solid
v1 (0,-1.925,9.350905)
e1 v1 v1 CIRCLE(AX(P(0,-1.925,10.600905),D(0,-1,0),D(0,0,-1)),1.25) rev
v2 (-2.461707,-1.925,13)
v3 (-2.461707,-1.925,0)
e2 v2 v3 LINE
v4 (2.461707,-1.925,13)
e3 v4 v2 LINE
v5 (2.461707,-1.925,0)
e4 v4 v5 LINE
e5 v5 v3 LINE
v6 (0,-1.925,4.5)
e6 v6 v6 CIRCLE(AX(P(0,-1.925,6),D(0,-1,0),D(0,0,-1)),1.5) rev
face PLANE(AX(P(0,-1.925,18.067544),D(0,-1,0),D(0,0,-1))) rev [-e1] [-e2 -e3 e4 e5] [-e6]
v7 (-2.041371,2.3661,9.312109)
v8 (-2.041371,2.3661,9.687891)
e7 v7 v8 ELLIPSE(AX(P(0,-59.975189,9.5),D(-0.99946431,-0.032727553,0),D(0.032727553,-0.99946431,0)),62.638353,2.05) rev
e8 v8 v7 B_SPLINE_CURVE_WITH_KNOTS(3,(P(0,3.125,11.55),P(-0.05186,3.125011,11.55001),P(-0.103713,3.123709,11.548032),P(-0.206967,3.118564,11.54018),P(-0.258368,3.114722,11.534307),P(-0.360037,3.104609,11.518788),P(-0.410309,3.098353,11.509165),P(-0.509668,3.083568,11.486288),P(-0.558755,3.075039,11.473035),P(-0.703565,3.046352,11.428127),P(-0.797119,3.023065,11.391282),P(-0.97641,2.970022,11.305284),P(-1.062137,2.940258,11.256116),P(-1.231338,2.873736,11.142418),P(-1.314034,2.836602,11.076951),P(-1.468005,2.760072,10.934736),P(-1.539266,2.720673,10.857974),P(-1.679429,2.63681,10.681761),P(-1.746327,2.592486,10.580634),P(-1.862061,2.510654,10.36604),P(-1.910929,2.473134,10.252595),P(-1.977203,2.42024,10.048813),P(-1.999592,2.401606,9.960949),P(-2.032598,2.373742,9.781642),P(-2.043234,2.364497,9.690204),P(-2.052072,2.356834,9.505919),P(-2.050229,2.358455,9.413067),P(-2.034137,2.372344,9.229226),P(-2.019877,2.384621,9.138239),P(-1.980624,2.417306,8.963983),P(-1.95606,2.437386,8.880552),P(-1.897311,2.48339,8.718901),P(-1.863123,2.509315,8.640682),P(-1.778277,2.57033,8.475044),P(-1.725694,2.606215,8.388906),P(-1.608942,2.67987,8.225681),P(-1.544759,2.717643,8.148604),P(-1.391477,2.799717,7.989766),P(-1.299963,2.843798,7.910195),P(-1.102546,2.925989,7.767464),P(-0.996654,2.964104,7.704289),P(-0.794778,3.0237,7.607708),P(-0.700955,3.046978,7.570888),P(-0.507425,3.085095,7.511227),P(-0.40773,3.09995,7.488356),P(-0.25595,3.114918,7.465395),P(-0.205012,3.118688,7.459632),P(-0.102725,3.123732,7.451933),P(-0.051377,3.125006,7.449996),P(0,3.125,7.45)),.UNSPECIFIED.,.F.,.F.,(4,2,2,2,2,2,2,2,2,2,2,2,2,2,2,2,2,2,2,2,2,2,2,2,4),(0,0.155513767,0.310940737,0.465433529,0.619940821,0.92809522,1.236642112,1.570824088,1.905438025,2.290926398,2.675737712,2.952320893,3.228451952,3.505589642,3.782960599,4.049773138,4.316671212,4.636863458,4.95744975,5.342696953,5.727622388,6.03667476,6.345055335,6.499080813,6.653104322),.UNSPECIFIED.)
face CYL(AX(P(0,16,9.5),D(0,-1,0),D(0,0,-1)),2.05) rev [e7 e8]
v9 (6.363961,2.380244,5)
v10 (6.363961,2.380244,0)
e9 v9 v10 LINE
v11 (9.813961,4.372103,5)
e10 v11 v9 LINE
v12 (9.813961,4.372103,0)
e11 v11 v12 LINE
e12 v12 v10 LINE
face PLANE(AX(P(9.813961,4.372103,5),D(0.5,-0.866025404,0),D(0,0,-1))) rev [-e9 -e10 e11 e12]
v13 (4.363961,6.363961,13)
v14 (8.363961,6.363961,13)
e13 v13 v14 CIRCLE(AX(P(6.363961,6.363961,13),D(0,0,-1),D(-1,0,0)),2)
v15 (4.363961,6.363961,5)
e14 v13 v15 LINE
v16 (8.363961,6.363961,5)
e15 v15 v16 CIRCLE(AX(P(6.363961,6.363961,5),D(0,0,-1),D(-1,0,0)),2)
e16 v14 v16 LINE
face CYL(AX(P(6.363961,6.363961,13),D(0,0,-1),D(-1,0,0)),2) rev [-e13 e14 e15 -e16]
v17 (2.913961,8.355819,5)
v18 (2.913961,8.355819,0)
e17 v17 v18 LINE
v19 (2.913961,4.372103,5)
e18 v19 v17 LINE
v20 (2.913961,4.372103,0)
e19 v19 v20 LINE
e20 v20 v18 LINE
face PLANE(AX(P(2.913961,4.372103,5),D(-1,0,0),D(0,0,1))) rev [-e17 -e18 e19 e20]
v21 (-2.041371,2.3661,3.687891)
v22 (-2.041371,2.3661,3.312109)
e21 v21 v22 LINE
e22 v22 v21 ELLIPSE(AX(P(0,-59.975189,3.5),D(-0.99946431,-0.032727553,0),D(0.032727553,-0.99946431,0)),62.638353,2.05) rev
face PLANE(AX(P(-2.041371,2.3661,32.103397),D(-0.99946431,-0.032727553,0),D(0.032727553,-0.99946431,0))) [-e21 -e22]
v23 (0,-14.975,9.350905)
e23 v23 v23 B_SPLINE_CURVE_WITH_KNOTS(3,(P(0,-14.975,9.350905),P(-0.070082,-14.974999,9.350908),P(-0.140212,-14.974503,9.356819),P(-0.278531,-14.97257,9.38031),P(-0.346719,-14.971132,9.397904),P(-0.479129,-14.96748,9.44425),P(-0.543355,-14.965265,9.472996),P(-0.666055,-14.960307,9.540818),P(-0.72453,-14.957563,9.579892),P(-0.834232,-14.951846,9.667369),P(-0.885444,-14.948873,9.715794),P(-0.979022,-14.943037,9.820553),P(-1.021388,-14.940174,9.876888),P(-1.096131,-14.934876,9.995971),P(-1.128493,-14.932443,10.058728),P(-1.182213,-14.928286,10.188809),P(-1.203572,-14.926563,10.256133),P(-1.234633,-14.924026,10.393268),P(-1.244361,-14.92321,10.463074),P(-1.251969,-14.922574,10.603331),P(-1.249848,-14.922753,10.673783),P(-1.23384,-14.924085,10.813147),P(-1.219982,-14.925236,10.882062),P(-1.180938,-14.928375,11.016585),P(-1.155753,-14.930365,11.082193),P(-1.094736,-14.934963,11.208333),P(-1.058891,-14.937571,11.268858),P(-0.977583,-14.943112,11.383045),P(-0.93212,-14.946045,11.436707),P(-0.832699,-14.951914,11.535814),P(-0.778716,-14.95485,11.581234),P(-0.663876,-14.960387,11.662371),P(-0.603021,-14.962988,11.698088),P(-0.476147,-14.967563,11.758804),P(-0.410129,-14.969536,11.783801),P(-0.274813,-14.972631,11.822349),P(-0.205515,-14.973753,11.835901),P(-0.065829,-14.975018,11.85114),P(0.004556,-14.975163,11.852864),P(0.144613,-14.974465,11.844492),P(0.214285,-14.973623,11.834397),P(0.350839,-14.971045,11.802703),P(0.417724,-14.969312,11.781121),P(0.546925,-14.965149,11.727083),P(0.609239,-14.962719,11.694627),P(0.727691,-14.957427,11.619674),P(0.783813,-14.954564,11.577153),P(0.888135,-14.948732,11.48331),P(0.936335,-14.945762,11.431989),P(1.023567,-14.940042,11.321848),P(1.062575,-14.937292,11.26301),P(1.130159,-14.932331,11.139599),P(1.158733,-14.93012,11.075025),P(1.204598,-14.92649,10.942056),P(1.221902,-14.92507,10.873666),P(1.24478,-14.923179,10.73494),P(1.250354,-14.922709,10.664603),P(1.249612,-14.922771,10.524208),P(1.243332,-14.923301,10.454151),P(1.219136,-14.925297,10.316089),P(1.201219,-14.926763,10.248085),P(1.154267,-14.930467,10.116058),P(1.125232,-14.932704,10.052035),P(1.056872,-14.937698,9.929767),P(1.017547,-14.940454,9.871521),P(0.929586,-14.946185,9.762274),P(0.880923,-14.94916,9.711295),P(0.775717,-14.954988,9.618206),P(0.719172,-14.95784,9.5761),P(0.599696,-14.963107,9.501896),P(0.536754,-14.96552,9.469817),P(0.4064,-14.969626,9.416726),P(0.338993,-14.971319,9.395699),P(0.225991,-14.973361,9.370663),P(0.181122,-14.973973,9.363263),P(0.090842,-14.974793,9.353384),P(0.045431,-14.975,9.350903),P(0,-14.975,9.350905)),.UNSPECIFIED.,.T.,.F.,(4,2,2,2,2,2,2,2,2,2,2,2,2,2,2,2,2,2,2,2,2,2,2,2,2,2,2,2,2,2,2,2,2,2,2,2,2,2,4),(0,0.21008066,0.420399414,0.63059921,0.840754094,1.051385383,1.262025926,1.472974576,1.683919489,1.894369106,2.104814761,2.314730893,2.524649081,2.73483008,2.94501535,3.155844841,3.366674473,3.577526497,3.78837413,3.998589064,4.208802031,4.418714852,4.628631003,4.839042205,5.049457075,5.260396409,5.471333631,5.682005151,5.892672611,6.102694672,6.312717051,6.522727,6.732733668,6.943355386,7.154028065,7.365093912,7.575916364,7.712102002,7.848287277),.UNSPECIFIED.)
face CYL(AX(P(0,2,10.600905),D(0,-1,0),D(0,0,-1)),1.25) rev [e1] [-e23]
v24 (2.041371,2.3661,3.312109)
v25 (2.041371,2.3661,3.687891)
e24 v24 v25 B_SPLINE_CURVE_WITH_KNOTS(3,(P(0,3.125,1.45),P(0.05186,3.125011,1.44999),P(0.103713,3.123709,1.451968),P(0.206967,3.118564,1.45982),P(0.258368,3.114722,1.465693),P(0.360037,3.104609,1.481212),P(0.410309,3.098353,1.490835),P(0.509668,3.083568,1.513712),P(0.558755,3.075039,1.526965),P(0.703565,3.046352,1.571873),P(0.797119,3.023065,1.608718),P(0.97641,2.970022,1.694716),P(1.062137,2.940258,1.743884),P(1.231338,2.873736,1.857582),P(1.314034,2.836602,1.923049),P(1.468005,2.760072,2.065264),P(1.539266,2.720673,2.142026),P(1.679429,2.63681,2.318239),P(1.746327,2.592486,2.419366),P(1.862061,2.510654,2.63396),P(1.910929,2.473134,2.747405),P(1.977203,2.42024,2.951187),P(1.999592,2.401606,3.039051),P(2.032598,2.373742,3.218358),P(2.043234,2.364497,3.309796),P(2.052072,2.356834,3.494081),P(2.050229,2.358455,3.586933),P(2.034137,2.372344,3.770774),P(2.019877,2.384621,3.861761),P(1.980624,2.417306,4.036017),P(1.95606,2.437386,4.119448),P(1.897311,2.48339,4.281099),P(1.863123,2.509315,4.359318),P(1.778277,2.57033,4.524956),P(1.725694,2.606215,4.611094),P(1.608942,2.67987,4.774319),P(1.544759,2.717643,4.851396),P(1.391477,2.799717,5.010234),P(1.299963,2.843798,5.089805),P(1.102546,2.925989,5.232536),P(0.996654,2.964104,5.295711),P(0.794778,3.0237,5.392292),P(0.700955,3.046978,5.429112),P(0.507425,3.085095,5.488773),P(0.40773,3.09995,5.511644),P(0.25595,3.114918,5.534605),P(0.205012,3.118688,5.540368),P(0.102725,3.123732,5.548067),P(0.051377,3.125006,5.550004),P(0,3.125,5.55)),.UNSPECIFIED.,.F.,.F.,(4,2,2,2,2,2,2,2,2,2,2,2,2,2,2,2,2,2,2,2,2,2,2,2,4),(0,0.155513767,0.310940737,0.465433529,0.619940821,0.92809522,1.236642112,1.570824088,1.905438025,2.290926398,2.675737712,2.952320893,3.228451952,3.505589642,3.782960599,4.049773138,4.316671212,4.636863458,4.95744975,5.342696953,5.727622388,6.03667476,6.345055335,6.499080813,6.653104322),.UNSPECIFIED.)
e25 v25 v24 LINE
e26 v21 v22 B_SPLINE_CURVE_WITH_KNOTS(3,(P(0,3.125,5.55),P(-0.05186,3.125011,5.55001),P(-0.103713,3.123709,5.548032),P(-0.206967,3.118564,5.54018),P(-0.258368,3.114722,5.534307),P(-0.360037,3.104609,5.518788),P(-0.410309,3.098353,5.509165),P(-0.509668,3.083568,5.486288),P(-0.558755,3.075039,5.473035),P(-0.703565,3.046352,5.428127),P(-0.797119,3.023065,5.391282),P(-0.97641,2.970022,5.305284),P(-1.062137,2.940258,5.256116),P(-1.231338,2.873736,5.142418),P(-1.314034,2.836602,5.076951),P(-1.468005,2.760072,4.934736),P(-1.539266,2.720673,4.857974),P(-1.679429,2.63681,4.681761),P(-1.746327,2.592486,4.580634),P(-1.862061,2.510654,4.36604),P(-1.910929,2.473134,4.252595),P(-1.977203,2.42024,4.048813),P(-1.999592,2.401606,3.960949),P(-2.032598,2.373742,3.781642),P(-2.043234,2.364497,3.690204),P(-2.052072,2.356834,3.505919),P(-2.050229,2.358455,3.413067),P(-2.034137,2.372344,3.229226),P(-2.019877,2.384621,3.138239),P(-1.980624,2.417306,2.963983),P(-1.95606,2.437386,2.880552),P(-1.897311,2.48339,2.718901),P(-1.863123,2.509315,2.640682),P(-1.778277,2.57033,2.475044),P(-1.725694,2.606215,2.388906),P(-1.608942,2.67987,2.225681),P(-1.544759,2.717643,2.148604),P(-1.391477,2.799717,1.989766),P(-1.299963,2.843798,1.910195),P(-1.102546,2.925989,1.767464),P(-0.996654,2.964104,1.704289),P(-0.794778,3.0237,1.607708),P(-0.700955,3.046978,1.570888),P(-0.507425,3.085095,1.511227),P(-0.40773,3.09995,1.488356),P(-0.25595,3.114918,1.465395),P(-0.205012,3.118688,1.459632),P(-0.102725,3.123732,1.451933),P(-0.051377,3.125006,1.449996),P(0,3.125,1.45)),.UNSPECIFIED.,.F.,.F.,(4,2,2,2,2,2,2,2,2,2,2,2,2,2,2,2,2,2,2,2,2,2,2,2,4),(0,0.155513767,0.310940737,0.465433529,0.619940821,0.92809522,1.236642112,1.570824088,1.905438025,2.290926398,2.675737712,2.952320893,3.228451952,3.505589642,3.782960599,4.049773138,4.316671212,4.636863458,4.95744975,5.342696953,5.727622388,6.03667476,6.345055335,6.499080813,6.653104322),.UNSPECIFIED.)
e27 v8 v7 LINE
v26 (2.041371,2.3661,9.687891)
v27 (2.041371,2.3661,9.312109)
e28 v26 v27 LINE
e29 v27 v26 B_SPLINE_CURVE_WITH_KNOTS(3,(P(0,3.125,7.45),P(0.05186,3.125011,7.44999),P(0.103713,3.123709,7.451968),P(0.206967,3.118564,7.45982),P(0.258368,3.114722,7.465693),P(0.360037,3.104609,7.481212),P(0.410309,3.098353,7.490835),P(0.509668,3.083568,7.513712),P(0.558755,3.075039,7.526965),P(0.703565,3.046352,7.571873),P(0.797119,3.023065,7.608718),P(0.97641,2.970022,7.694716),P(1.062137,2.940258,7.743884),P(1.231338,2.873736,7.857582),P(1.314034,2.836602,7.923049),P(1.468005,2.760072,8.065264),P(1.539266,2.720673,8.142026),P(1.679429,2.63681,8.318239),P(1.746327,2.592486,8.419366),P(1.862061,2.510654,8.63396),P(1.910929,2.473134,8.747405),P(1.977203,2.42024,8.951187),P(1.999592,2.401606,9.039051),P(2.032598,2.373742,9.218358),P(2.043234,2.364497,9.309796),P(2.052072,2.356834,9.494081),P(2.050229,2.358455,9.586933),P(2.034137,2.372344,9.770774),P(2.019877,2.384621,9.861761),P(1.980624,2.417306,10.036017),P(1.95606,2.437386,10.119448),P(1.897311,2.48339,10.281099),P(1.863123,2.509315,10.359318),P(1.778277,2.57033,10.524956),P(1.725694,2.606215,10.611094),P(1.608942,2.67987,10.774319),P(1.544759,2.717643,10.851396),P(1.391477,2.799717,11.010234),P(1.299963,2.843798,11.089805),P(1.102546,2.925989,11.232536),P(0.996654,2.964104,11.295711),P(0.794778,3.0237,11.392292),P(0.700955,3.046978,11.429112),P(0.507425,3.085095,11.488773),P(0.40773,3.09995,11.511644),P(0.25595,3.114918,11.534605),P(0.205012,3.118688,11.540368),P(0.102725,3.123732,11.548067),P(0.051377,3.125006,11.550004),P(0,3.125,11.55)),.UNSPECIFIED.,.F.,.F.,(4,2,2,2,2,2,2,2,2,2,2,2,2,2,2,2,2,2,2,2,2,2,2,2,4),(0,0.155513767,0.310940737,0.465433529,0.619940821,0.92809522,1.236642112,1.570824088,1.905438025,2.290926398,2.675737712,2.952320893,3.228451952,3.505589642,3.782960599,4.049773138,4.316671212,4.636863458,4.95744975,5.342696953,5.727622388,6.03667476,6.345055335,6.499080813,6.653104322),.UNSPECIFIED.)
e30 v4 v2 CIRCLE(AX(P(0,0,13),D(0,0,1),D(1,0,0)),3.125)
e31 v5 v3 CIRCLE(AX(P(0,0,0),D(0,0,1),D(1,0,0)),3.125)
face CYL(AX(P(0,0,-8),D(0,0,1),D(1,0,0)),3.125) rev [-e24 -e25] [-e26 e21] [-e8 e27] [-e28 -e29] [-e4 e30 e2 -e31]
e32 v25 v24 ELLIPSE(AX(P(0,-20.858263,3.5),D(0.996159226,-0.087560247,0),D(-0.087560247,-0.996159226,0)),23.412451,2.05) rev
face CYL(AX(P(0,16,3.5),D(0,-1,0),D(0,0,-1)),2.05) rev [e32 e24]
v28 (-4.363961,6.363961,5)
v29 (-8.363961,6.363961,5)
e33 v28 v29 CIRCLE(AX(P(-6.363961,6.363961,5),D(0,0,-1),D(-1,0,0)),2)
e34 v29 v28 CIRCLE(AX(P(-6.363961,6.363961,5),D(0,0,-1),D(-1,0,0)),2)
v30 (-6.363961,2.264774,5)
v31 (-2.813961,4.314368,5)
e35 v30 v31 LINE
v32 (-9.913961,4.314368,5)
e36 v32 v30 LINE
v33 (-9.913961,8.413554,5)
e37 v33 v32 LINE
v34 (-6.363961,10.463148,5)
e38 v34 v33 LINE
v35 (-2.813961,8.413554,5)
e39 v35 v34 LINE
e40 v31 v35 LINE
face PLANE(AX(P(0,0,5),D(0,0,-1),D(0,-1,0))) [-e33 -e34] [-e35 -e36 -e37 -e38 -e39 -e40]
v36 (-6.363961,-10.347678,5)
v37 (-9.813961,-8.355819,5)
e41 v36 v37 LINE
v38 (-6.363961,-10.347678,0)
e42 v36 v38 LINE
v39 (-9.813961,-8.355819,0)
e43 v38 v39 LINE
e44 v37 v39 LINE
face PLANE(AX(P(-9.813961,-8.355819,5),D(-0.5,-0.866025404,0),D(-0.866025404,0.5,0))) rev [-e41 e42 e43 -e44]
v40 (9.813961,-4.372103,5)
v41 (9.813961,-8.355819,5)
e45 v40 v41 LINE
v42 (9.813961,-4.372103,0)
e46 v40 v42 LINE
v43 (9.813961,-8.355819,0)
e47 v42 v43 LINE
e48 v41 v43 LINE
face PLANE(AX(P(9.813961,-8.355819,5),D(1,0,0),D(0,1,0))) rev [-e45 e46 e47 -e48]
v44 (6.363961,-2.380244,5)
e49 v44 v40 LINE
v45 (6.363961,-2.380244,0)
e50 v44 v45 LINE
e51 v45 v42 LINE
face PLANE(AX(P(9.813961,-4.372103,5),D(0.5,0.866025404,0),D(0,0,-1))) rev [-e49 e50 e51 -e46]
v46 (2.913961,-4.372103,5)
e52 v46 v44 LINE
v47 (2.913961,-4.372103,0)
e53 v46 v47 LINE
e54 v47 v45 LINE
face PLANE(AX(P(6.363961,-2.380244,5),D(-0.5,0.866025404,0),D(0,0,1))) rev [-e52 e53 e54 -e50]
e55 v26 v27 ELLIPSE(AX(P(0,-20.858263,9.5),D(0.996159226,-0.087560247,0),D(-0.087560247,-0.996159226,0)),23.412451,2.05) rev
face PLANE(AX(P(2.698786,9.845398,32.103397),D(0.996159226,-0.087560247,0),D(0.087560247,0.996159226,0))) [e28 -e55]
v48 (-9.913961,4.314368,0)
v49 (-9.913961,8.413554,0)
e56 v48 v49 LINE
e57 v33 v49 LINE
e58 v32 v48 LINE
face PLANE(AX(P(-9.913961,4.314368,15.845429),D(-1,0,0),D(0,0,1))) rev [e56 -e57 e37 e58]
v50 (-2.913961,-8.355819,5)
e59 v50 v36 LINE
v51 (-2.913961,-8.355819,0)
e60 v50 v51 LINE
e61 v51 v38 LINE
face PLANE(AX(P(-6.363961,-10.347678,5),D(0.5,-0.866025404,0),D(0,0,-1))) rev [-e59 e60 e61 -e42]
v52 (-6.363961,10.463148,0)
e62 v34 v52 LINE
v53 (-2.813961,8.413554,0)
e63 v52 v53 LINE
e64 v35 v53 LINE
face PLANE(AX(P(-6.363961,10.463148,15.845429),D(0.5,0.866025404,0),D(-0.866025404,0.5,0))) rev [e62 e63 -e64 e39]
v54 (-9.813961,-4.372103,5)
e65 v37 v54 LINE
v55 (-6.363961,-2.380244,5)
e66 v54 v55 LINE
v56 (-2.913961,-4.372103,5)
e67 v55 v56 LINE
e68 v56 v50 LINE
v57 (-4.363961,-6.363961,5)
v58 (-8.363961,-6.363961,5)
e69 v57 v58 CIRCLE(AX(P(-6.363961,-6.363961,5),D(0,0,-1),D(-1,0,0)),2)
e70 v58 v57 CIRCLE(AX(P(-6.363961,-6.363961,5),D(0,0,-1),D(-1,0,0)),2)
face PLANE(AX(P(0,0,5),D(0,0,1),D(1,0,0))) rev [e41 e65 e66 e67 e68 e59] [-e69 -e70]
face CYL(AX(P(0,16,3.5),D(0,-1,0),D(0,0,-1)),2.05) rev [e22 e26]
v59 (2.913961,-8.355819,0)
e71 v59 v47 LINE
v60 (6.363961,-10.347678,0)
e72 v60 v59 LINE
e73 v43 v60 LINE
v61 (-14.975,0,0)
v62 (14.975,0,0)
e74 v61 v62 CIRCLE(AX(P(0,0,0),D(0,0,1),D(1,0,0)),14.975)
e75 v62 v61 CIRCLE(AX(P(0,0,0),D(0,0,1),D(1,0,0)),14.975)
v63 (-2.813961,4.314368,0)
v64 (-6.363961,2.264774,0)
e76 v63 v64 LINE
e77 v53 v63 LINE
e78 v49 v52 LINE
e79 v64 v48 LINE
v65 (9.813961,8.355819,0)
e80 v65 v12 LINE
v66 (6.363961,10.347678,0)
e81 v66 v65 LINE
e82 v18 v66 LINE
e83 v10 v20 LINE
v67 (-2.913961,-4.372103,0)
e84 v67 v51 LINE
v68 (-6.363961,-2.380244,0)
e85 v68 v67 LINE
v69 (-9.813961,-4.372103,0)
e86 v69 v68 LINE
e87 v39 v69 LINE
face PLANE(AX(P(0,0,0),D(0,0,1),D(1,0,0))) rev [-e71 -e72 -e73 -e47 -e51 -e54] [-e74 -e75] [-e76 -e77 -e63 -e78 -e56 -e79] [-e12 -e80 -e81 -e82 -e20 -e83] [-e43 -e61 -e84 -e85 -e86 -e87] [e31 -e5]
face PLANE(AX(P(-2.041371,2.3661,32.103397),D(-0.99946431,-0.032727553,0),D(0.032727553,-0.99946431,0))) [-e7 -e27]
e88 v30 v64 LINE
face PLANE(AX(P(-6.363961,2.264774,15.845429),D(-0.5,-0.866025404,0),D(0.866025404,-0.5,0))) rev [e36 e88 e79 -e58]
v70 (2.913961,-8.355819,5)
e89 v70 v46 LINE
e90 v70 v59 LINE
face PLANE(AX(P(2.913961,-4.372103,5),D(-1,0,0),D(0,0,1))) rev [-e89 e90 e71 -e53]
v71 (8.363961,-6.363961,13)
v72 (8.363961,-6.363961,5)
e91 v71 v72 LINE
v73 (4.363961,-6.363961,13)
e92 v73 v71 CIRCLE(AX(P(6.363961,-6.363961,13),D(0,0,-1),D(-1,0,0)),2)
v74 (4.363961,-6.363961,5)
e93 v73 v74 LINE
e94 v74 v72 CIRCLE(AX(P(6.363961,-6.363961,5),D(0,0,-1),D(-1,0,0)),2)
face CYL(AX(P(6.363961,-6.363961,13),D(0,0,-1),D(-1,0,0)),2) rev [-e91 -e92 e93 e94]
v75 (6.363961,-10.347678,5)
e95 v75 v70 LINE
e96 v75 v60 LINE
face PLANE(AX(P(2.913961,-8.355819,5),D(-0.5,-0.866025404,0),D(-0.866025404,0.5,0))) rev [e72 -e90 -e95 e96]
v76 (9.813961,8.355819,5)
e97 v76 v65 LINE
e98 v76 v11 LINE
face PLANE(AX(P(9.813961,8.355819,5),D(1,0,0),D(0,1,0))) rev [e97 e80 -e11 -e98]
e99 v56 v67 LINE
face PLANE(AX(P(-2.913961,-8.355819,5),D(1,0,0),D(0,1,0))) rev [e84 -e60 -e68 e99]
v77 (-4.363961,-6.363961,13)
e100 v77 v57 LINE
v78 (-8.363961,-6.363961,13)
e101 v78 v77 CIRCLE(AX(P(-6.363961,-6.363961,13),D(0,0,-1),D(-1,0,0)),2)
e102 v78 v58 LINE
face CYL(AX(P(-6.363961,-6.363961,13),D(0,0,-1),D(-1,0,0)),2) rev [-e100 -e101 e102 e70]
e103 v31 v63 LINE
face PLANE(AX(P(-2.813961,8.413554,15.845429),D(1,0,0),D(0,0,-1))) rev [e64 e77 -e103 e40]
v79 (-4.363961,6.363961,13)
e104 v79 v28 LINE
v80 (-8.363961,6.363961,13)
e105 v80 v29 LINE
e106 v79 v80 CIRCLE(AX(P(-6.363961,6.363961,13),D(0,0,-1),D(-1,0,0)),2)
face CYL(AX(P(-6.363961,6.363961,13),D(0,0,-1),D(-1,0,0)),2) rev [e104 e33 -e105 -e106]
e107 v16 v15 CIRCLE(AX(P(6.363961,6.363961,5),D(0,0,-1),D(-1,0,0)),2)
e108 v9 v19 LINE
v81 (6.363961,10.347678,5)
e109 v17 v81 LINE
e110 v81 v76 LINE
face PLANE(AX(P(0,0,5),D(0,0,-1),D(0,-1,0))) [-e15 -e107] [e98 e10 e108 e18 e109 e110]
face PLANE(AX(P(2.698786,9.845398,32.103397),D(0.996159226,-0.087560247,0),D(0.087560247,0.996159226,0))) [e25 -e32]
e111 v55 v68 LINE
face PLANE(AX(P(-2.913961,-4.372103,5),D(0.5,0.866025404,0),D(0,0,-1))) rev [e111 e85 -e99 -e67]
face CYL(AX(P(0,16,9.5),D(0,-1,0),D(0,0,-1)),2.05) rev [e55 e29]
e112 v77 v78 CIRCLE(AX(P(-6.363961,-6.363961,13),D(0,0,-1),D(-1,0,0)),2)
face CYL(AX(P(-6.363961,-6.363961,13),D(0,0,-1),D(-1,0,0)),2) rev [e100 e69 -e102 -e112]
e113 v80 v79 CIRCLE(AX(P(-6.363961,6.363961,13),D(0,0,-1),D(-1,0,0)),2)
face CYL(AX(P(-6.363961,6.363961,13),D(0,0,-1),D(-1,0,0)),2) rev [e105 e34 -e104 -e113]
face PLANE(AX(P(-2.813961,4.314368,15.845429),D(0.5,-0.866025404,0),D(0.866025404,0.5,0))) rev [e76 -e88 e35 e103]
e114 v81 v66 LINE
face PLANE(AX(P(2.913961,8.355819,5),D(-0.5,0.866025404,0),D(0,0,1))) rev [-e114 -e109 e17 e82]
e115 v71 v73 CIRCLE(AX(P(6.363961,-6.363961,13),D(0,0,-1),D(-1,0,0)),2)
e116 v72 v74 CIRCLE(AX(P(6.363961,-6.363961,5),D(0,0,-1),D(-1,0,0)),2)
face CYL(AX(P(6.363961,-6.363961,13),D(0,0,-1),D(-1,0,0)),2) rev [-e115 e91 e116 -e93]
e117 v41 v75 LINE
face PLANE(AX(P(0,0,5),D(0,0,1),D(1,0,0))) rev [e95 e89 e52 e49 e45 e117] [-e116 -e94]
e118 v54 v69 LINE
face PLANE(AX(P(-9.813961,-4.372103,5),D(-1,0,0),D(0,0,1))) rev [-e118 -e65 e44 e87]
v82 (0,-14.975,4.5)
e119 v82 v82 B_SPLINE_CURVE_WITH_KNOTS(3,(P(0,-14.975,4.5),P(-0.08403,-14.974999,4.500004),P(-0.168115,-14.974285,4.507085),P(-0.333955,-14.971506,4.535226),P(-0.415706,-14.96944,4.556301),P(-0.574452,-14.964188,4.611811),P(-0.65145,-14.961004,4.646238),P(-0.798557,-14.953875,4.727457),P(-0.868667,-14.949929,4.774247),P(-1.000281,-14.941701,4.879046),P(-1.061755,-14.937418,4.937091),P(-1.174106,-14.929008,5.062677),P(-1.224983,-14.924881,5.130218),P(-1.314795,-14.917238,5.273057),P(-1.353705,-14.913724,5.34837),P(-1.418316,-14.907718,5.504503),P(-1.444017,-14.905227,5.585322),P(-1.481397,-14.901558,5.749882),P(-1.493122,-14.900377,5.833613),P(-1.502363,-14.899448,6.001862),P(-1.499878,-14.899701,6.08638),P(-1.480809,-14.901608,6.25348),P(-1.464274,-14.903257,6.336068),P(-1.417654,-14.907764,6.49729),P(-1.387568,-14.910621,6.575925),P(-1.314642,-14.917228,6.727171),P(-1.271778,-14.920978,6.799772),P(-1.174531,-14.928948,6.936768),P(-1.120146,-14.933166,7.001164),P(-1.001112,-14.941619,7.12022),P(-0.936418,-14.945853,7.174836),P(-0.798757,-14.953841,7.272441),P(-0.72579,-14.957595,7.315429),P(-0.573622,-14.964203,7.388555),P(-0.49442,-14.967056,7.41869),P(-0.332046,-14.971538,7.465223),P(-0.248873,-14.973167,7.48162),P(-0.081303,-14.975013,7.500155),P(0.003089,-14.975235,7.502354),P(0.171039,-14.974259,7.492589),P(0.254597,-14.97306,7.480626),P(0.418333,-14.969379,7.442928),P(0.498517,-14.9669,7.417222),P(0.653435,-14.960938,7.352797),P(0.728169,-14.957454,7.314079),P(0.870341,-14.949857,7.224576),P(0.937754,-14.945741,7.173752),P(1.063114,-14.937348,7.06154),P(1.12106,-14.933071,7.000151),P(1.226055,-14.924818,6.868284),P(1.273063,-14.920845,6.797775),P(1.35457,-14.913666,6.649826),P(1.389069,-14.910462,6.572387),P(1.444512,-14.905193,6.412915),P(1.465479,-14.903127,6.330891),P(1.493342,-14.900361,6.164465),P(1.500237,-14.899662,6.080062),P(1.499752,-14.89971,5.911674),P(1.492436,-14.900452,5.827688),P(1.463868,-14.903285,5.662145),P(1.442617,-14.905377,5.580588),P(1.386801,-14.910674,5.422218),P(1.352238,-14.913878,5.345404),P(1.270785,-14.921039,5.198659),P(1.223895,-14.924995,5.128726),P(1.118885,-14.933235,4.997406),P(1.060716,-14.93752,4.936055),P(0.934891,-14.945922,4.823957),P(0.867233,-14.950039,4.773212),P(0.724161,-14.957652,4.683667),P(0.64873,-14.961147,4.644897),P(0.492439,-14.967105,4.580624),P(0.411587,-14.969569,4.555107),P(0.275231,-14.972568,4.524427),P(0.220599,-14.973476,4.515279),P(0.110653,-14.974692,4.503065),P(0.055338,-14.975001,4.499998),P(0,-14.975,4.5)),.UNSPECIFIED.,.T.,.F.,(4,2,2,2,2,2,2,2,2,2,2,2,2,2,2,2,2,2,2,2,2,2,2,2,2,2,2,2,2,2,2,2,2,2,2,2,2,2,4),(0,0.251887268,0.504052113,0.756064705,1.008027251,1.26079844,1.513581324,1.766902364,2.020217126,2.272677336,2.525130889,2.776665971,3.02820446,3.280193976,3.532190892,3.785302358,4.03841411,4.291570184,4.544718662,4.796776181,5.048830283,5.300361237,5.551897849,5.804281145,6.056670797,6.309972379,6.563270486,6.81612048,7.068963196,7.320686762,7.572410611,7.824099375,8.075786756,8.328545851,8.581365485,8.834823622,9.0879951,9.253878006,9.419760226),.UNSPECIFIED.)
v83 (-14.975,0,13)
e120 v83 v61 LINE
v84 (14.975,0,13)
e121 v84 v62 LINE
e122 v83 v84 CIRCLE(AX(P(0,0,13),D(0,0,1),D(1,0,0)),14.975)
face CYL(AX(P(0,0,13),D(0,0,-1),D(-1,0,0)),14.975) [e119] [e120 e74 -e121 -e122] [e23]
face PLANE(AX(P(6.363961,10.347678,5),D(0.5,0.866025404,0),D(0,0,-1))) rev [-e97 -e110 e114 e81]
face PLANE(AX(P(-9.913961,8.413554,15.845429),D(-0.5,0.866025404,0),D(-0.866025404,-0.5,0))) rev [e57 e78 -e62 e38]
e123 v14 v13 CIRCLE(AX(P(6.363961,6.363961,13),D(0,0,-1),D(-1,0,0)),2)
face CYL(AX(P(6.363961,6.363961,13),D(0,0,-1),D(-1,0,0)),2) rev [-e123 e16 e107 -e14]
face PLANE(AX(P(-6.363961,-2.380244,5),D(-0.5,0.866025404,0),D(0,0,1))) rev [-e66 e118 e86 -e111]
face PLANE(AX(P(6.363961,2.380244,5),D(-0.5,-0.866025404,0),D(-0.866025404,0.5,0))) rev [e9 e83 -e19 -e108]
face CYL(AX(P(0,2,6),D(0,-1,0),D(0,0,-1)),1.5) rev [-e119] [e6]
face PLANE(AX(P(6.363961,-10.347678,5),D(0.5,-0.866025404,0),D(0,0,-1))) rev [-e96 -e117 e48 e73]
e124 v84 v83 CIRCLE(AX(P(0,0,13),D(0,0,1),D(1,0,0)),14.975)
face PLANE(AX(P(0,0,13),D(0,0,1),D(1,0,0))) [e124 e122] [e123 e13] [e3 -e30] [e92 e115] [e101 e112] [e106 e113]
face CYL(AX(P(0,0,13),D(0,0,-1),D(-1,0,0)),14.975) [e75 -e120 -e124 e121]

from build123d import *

# Parameters (mm, degrees)
CUT_EXTRUDE1_START       = -13
CUT_EXTRUDE1_OUTLINE_R   = 14.975
CUT_EXTRUDE1_OUTLINE_R_2 = 3.125
CUT_EXTRUDE1_DEPTH       = 13
CUT_EXTRUDE1_START_2     = -8
CUT_EXTRUDE1_2_OUTLINE_R = 2
CUT_EXTRUDE1_2_DEPTH     = 8
CUT_EXTRUDE3_DEPTH       = 5
BOSS_EXTRUDE1_DEPTH      = 13
CUT_EXTRUDE4_DEPTH       = 2
CUT_EXTRUDE4_DEPTH_BACK  = 22
BOSS_EXTRUDE2_REACH      = 26.85


with BuildPart() as part:
    # Cut-Extrude1: read off the stored shape, not the designer's step
    # Cut-Extrude1 outline → Cut-Extrude1 (new body)
    with BuildSketch(Plane.XY.offset(13).offset(CUT_EXTRUDE1_START)):
        Circle(CUT_EXTRUDE1_OUTLINE_R)
        Polygon((-6.363961031, -2.380244173), (-2.913961031, -4.372102602), (-2.913961031, -8.355819459), (-6.363961031, -10.347677888), (-9.813961031, -8.355819459), (-9.813961031, -4.372102602), align=None, mode=Mode.SUBTRACT)
        Polygon((9.813961031, -8.355819459), (6.363961031, -10.347677888), (2.913961031, -8.355819459), (2.913961031, -4.372102602), (6.363961031, -2.380244173), (9.813961031, -4.372102602), align=None, mode=Mode.SUBTRACT)
        Circle(CUT_EXTRUDE1_OUTLINE_R_2, mode=Mode.SUBTRACT)
        Polygon((-9.813961031, 8.355819459), (-6.363961031, 10.347677888), (-2.913961031, 8.355819459), (-2.913961031, 4.372102602), (-6.363961031, 2.380244173), (-9.813961031, 4.372102602), align=None, mode=Mode.SUBTRACT)
        Polygon((6.363961031, 2.380244173), (2.913961031, 4.372102602), (2.913961031, 8.355819459), (6.363961031, 10.347677888), (9.813961031, 8.355819459), (9.813961031, 4.372102602), align=None, mode=Mode.SUBTRACT)
    extrude(amount=CUT_EXTRUDE1_DEPTH)

    # Cut-Extrude1 2 outline → Cut-Extrude1 2 (add)
    # profile 1 of 4: a face of its own
    with BuildSketch(Plane.XY.offset(13).offset(CUT_EXTRUDE1_START_2)):
        Polygon((2.913961031, -8.355819459), (6.363961031, -10.347677888), (9.813961031, -8.355819459), (9.813961031, -4.372102602), (6.363961031, -2.380244173), (2.913961031, -4.372102602), align=None)
        with Locations((6.363961031, -6.363961031)):
            Circle(CUT_EXTRUDE1_2_OUTLINE_R, mode=Mode.SUBTRACT)
    # profile 2 of 4: a face of its own
    with BuildSketch(Plane.XY.offset(13).offset(CUT_EXTRUDE1_START_2)):
        Polygon((-2.913961031, -8.355819459), (-2.913961031, -4.372102602), (-6.363961031, -2.380244173), (-9.813961031, -4.372102602), (-9.813961031, -8.355819459), (-6.363961031, -10.347677888), align=None)
        with Locations((-6.363961031, -6.363961031)):
            Circle(CUT_EXTRUDE1_2_OUTLINE_R, mode=Mode.SUBTRACT)
    # profile 3 of 4: a face of its own
    with BuildSketch(Plane.XY.offset(13).offset(CUT_EXTRUDE1_START_2)):
        Polygon((-2.913961031, 8.355819459), (-6.363961031, 10.347677888), (-9.813961031, 8.355819459), (-9.813961031, 4.372102602), (-6.363961031, 2.380244173), (-2.913961031, 4.372102602), align=None)
        with Locations((-6.363961031, 6.363961031)):
            Circle(CUT_EXTRUDE1_2_OUTLINE_R, mode=Mode.SUBTRACT)
    # profile 4 of 4: a face of its own
    with BuildSketch(Plane.XY.offset(13).offset(CUT_EXTRUDE1_START_2)):
        Polygon((2.913961031, 8.355819459), (2.913961031, 4.372102602), (6.363961031, 2.380244173), (9.813961031, 4.372102602), (9.813961031, 8.355819459), (6.363961031, 10.347677888), align=None)
        with Locations((6.363961031, 6.363961031)):
            Circle(CUT_EXTRUDE1_2_OUTLINE_R, mode=Mode.SUBTRACT)
    extrude(amount=CUT_EXTRUDE1_2_DEPTH)

    # Cut-Extrude1 3: loft between two sections, ruled curve by curve
    cut_extrude1_3_from = [
        Edge.make_three_point_arc((0, 14.975, 1.45), (1.449568901, 14.975, 2.050431099), (2.05, 14.975, 3.5)),
        Edge.make_three_point_arc((2.05, 14.975, 3.5), (1.449568901, 14.975, 4.949568901), (0, 14.975, 5.55)),
        Edge.make_three_point_arc((0, 14.975, 5.55), (-1.449568901, 14.975, 4.949568901), (-2.05, 14.975, 3.5)),
        Edge.make_three_point_arc((-2.05, 14.975, 3.5), (-1.449568901, 14.975, 2.050431099), (0, 14.975, 1.45)),
    ]
    cut_extrude1_3_to = [
        Edge.make_three_point_arc((0, 2.358384549, 1.45), (1.449568901, 2.358384549, 2.050431099), (2.05, 2.358384549, 3.5)),
        Edge.make_three_point_arc((2.05, 2.358384549, 3.5), (1.449568901, 2.358384549, 4.949568901), (0, 2.358384549, 5.55)),
        Edge.make_three_point_arc((0, 2.358384549, 5.55), (-1.449568901, 2.358384549, 4.949568901), (-2.05, 2.358384549, 3.5)),
        Edge.make_three_point_arc((-2.05, 2.358384549, 3.5), (-1.449568901, 2.358384549, 2.050431099), (0, 2.358384549, 1.45)),
    ]
    cut_extrude1_3 = Solid(Shell([*[Face.make_surface_from_curves(cut_extrude1_3_from[k], cut_extrude1_3_to[k]) for k in range(4)], Face(Wire(cut_extrude1_3_from)), Face(Wire(cut_extrude1_3_to))]))
    add(cut_extrude1_3, mode=Mode.SUBTRACT)

    # Cut-Extrude1 4: loft between two sections, ruled curve by curve
    cut_extrude1_4_from = [
        Edge.make_three_point_arc((0, 14.975, 7.45), (1.449568901, 14.975, 8.050431099), (2.05, 14.975, 9.5)),
        Edge.make_three_point_arc((2.05, 14.975, 9.5), (1.449568901, 14.975, 10.949568901), (0, 14.975, 11.55)),
        Edge.make_three_point_arc((0, 14.975, 11.55), (-1.449568901, 14.975, 10.949568901), (-2.05, 14.975, 9.5)),
        Edge.make_three_point_arc((-2.05, 14.975, 9.5), (-1.449568901, 14.975, 8.050431099), (0, 14.975, 7.45)),
    ]
    cut_extrude1_4_to = [
        Edge.make_three_point_arc((0, 2.358384549, 7.45), (1.449568901, 2.358384549, 8.050431099), (2.05, 2.358384549, 9.5)),
        Edge.make_three_point_arc((2.05, 2.358384549, 9.5), (1.449568901, 2.358384549, 10.949568901), (0, 2.358384549, 11.55)),
        Edge.make_three_point_arc((0, 2.358384549, 11.55), (-1.449568901, 2.358384549, 10.949568901), (-2.05, 2.358384549, 9.5)),
        Edge.make_three_point_arc((-2.05, 2.358384549, 9.5), (-1.449568901, 2.358384549, 8.050431099), (0, 2.358384549, 7.45)),
    ]
    cut_extrude1_4 = Solid(Shell([*[Face.make_surface_from_curves(cut_extrude1_4_from[k], cut_extrude1_4_to[k]) for k in range(4)], Face(Wire(cut_extrude1_4_from)), Face(Wire(cut_extrude1_4_to))]))
    add(cut_extrude1_4, mode=Mode.SUBTRACT)

    # Sketch2 → Cut-Extrude3 (cut)
    with BuildSketch(Plane(origin=(0, 0, 0), x_dir=(-1, 0, 0), z_dir=(0, 0, -1))):
        Polygon((2.813961031, 8.413554486), (2.813961031, 4.314367575), (6.363961031, 2.264774119), (9.913961031, 4.314367575), (9.913961031, 8.413554486), (6.363961031, 10.463147942), align=None)
    extrude(amount=-CUT_EXTRUDE3_DEPTH, mode=Mode.SUBTRACT)

    # Sketch4 → Boss-Extrude1 (add)
    with BuildSketch(Plane(origin=(0, 0, 0), x_dir=(-1, 0, 0), z_dir=(0, 0, -1))):
        with BuildLine():
            ThreePointArc((-2.461706725, -1.925), (-1.369306394, -2.809025632), (0, -3.125))
            Line((0, -3.125), (0, -1.925))
            Line((0, -1.925), (-2.461706725, -1.925))
        make_face()
        with BuildLine():
            Line((0, -1.925), (0, -3.125))
            ThreePointArc((0, -3.125), (1.369306394, -2.809025632), (2.461706725, -1.925))
            Line((2.461706725, -1.925), (0, -1.925))
        make_face()
    extrude(amount=-BOSS_EXTRUDE1_DEPTH)

    # Sketch3 → Cut-Extrude4 (cut, two sides: drawn at the far end of the back side and taken through both)
    with BuildSketch(Plane(origin=(0, 0, 0), x_dir=(1, 0, 0), z_dir=(0, 1, 0)).offset(-CUT_EXTRUDE4_DEPTH_BACK)):
        with BuildLine():
            ThreePointArc((0, -4.5), (-1.5, -6), (0, -7.5))
            Line((0, -7.5), (0, -4.5))
        make_face()
        with BuildLine():
            Line((0, -4.5), (0, -7.5))
            ThreePointArc((0, -7.5), (1.060660172, -7.060660172), (1.5, -6))
            ThreePointArc((1.5, -6), (1.060660172, -4.939339828), (0, -4.5))
        make_face()
        with BuildLine():
            ThreePointArc((0, -9.350905038), (-1.25, -10.600905038), (0, -11.850905038))
            Line((0, -11.850905038), (0, -9.350905038))
        make_face()
        with BuildLine():
            Line((0, -9.350905038), (0, -11.850905038))
            ThreePointArc((0, -11.850905038), (0.883883476, -11.484788515), (1.25, -10.600905038))
            ThreePointArc((1.25, -10.600905038), (0.883883476, -9.717021562), (0, -9.350905038))
        make_face()
    extrude(amount=CUT_EXTRUDE4_DEPTH + CUT_EXTRUDE4_DEPTH_BACK, mode=Mode.SUBTRACT)

    # Sketch5 → Boss-Extrude2 (add, up to next)
    with BuildSketch(Plane(origin=(0, 0, 0), x_dir=(-1, 0, 0), z_dir=(0, 0, -1)), mode=Mode.PRIVATE) as boss_extrude2_sk1:
        with BuildLine():
            Line((-4.568894393, 14.260989763), (-3.6536631, 9.845398343))
            Line((-3.6536631, 9.845398343), (-2.698785597, 9.845398343))
            Line((-2.698785597, 9.845398343), (-2.04137138, 2.366099721))
            ThreePointArc((-2.04137138, 2.366099721), (0, 3.125), (2.04137138, 2.366099721))
            Line((2.04137138, 2.366099721), (2.335168556, 11.338349863))
            Line((2.335168556, 11.338349863), (6.630079619, 11.338349863))
            Line((6.630079619, 11.338349863), (8.4371537, 9.779282306))
            Line((8.4371537, 9.779282306), (9.782251652, 11.338349863))
            ThreePointArc((9.782251652, 11.338349863), (2.988348955, 14.673799628), (-4.568894393, 14.260989763))
        make_face()
    boss_extrude2_tool1 = extrude(boss_extrude2_sk1.sketch, amount=-BOSS_EXTRUDE2_REACH, mode=Mode.PRIVATE) - part.part
    add(boss_extrude2_tool1.solids().sort_by_distance((-0.855715, 10.107885, 0))[0])
    add(boss_extrude2_tool1.solids().sort_by_distance((-0.855715, 10.107885, 0))[1])


solid = part.part
